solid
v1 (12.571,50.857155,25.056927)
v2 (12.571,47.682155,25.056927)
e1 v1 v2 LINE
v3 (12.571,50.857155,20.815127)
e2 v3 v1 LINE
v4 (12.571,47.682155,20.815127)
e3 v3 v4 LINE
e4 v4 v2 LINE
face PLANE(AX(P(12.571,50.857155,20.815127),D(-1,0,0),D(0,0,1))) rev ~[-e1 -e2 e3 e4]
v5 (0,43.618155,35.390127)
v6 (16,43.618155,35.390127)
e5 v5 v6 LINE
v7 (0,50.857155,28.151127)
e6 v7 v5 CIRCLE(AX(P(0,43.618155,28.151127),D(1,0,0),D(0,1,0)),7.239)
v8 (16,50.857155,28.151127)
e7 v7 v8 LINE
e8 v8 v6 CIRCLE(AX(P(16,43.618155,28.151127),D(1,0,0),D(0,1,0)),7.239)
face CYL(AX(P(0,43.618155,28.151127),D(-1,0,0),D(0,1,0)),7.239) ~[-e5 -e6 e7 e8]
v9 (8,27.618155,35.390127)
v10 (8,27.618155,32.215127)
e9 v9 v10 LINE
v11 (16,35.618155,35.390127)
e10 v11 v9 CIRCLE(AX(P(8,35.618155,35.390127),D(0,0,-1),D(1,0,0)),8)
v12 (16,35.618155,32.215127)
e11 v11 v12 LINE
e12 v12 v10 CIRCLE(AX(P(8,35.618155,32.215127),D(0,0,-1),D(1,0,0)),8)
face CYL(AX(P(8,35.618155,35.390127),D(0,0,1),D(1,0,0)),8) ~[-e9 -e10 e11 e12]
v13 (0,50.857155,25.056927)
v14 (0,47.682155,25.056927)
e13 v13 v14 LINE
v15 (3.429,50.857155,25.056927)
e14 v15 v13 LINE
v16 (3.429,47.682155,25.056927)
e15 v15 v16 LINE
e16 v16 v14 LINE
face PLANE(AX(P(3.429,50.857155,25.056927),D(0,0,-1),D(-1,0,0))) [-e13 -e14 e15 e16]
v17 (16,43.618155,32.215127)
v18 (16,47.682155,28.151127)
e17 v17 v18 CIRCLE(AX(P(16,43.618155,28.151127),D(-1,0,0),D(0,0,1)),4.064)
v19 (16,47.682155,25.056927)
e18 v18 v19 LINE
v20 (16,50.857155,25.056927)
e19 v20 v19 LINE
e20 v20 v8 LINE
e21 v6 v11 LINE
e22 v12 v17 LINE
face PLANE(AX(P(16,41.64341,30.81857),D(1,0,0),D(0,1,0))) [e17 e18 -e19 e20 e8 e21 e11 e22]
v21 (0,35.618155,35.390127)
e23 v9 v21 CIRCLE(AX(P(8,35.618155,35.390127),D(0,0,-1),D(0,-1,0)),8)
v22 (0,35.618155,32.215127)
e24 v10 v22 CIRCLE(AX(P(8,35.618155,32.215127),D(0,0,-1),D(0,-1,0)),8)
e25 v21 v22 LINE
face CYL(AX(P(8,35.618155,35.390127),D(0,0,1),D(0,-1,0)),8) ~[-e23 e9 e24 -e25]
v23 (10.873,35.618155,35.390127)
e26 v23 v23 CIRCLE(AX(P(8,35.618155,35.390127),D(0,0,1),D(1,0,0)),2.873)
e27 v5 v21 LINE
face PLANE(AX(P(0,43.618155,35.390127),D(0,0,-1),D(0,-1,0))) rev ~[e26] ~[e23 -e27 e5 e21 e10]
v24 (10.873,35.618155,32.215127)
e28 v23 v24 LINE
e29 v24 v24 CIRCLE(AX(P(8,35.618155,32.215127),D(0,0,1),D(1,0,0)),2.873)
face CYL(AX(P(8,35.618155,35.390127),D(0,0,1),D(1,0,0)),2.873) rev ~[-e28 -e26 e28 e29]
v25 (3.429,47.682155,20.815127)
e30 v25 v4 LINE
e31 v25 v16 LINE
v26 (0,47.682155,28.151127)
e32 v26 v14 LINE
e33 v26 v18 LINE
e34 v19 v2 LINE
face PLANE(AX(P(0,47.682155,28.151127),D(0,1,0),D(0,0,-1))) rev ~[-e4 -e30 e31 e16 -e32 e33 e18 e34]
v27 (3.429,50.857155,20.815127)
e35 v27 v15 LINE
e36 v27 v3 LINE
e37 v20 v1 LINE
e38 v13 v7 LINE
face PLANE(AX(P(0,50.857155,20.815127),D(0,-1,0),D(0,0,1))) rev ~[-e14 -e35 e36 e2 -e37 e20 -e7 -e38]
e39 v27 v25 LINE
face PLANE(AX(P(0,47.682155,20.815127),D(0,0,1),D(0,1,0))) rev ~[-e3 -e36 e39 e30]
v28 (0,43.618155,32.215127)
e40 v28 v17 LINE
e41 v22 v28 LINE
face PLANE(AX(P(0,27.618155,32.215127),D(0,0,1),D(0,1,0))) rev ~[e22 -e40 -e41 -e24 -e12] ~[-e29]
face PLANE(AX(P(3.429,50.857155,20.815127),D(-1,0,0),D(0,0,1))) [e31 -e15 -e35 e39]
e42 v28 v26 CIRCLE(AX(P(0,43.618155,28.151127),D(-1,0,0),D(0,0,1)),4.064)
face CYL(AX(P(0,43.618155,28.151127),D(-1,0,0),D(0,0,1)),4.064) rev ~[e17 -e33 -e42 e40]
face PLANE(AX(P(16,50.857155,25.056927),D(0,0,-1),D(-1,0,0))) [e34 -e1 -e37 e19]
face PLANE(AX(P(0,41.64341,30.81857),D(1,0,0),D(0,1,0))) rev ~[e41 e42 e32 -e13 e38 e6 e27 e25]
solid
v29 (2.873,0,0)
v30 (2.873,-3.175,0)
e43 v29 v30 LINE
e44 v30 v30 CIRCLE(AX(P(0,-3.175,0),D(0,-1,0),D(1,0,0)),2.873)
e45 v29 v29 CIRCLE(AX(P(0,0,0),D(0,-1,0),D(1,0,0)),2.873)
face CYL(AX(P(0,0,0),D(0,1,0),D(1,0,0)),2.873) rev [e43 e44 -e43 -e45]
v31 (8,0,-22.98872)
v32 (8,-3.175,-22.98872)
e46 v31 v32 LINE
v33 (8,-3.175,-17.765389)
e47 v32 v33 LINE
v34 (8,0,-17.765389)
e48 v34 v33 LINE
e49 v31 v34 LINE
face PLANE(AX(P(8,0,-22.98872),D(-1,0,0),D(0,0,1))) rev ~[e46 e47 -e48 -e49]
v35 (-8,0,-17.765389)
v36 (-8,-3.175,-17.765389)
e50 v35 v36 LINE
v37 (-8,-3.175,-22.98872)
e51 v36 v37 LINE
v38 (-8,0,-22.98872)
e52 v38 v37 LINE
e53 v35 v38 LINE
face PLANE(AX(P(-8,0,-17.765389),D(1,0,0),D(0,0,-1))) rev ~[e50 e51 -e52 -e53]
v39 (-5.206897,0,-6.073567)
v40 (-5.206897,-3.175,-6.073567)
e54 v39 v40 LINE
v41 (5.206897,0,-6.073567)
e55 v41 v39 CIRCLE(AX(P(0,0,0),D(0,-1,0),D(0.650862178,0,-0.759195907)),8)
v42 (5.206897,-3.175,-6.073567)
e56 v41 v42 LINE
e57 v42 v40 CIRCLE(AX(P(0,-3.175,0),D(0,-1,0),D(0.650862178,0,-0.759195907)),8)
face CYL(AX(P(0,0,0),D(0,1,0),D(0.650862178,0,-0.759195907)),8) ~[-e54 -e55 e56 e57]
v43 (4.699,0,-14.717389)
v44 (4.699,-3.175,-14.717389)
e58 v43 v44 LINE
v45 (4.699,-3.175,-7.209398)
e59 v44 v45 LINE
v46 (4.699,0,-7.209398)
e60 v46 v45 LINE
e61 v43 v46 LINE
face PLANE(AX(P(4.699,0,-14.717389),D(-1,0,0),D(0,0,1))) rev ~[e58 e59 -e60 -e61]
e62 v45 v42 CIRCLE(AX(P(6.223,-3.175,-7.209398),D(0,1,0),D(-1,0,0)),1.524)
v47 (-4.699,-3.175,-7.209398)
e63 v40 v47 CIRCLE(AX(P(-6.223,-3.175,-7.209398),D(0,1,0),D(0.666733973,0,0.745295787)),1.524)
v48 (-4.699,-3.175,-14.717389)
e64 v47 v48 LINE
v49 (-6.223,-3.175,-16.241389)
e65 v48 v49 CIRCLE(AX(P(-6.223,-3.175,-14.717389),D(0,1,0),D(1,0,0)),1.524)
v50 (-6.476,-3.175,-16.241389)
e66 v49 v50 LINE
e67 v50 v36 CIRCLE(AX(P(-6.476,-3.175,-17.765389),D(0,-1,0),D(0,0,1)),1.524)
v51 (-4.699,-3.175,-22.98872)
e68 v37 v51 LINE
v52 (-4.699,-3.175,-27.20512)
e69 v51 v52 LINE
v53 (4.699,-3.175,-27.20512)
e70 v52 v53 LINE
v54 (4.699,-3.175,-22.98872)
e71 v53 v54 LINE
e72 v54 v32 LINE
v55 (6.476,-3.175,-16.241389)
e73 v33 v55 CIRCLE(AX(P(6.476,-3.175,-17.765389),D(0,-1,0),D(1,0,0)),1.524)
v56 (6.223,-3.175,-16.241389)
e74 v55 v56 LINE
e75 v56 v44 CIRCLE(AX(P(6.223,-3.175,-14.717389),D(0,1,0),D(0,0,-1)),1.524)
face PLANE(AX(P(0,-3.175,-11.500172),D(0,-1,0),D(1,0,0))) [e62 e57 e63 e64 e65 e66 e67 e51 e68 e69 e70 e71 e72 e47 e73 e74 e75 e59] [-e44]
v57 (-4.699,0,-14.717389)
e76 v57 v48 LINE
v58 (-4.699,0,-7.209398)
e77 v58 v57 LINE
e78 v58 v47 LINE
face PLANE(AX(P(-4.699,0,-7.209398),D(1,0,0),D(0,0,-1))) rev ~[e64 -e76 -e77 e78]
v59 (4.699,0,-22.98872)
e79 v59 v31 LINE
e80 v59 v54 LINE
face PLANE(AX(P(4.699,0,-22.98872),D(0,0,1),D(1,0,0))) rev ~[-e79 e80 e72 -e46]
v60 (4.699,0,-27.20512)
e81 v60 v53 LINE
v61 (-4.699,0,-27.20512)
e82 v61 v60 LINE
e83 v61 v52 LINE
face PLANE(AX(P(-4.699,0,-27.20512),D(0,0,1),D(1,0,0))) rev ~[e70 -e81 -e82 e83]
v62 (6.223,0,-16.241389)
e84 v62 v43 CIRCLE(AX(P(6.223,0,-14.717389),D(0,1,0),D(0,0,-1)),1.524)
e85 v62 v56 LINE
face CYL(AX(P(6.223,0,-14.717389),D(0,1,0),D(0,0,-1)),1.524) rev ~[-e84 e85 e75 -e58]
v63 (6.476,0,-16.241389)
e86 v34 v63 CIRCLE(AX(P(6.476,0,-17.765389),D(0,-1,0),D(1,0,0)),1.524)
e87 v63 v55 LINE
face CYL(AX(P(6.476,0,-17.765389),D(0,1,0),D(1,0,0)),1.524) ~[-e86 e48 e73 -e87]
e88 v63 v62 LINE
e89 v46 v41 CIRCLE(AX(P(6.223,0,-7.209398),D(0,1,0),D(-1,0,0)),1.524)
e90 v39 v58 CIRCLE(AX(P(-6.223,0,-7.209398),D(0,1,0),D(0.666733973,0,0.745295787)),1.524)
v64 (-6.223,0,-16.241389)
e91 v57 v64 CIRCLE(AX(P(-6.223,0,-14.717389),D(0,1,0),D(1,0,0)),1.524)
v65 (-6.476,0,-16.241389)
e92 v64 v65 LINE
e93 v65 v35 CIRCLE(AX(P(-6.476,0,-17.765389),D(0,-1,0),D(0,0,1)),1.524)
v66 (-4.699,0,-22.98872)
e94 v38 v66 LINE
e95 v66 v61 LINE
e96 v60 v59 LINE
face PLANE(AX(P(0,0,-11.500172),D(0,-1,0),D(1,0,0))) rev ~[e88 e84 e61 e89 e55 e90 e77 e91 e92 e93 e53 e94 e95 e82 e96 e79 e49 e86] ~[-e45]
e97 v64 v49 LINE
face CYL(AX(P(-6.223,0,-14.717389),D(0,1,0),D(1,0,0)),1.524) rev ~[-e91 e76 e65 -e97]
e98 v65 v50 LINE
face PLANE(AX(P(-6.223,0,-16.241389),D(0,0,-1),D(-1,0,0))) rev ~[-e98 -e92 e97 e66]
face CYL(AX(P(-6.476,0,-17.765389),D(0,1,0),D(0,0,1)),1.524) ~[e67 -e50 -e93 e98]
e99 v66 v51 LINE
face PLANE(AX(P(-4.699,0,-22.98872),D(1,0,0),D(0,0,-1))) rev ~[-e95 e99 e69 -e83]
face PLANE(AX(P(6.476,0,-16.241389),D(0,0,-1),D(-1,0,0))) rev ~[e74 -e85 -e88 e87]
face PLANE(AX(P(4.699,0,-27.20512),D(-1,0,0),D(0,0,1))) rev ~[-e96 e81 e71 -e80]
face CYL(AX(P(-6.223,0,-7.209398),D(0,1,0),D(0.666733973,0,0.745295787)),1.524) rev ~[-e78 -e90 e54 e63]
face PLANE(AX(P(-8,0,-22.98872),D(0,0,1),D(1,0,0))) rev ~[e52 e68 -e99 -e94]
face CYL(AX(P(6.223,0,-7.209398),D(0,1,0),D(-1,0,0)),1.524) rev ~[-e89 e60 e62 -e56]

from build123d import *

# Parameters (mm, degrees)
F0_R     = 2.873
F1_DEPTH = 3.175
F3_DEPTH = 16
F4_W     = 3.429
F4_H     = 4.2418
F5_DEPTH = 25.4
F6_R     = 2.873
F7_DEPTH = 3.175


with BuildPart() as f1:
    # F0 (on Front) → F1 (new body)
    with BuildSketch(Plane.XZ):
        with BuildLine():
            ThreePointArc((-5.2068974255, -6.0735672549), (-4.831756613, -6.587290456), (-4.699, -7.2093980338))
            Line((-4.699, -7.2093980338), (-4.699, -14.7173892691))
            ThreePointArc((-4.699, -14.7173892691), (-5.1453692655, -15.7950200036), (-6.223, -16.2413892691))
            Line((-6.223, -16.2413892691), (-6.476, -16.2413892691))
            ThreePointArc((-6.476, -16.2413892691), (-7.5536307345, -16.6877585345), (-8, -17.7653892691))
            Line((-8, -17.7653892691), (-8, -22.9887201977))
            Line((-8, -22.9887201977), (-4.699, -22.9887201977))
            Line((-4.699, -22.9887201977), (-4.699, -27.2051201977))
            Line((-4.699, -27.2051201977), (0, -27.2051201977))
            Line((0, -27.2051201977), (4.699, -27.2051201977))
            Line((4.699, -27.2051201977), (4.699, -22.9887201977))
            Line((4.699, -22.9887201977), (8, -22.9887201977))
            Line((8, -22.9887201977), (8, -17.7653892691))
            ThreePointArc((8, -17.7653892691), (7.5536307345, -16.6877585345), (6.476, -16.2413892691))
            Line((6.476, -16.2413892691), (6.223, -16.2413892691))
            ThreePointArc((6.223, -16.2413892691), (5.1453692655, -15.7950200036), (4.699, -14.7173892691))
            Line((4.699, -14.7173892691), (4.699, -7.2093980338))
            ThreePointArc((4.699, -7.2093980338), (4.831756613, -6.587290456), (5.2068974255, -6.0735672549))
            ThreePointArc((5.2068974255, -6.0735672549), (0, 8), (-5.2068974255, -6.0735672549))
        make_face()
        Circle(F0_R, mode=Mode.SUBTRACT)
    extrude(amount=F1_DEPTH)


with BuildPart() as f3:
    # F2 (on Right) → F3 (new body)
    with BuildSketch(Plane.YZ):
        with BuildLine():
            Line((47.6821554806, 20.8151274502), (50.8571554806, 20.8151274502))
            Line((50.8571554806, 20.8151274502), (50.8571554806, 28.1511274502))
            ThreePointArc((50.8571554806, 28.1511274502), (48.7369014696, 33.2698734392), (43.6181554806, 35.3901274502))
            Line((43.6181554806, 35.3901274502), (27.6181554806, 35.3901274502))
            Line((27.6181554806, 35.3901274502), (27.6181554806, 32.2151274502))
            Line((27.6181554806, 32.2151274502), (43.6181554806, 32.2151274502))
            ThreePointArc((43.6181554806, 32.2151274502), (46.4918374394, 31.024809409), (47.6821554806, 28.1511274502))
            Line((47.6821554806, 28.1511274502), (47.6821554806, 20.8151274502))
        make_face()
    extrude(amount=F3_DEPTH)

    # F4 (on face) → F5 (cut)
    with BuildSketch(Plane(origin=(0, 50.8571554806, 0), x_dir=(-1, 0, 0), z_dir=(0, 1, 0))):
        with Locations((-14.2855, 22.9360274502)):
            Rectangle(F4_W, F4_H)
        with Locations((-1.7145, 22.9360274502)):
            Rectangle(F4_W, F4_H)
    extrude(amount=-F5_DEPTH, mode=Mode.SUBTRACT)

    # F6 (on face) → F7 (cut, through all)
    with BuildSketch(Plane.XY.offset(35.3901274502)):
        with BuildLine():
            Line((0, 27.6181554806), (8, 27.6181554806))
            ThreePointArc((8, 27.6181554806), (2.3431457505, 29.9613012311), (0, 35.6181554806))
            Line((0, 35.6181554806), (0, 27.6181554806))
        make_face()
        with BuildLine():
            Line((16, 27.6181554806), (16, 35.6181554806))
            ThreePointArc((16, 35.6181554806), (13.6568542495, 29.9613012311), (8, 27.6181554806))
            Line((8, 27.6181554806), (16, 27.6181554806))
        make_face()
        with Locations((8, 35.6181554806)):
            Circle(F6_R)
    extrude(amount=-F7_DEPTH, mode=Mode.SUBTRACT)


solid = Compound([f1.part, f3.part])
